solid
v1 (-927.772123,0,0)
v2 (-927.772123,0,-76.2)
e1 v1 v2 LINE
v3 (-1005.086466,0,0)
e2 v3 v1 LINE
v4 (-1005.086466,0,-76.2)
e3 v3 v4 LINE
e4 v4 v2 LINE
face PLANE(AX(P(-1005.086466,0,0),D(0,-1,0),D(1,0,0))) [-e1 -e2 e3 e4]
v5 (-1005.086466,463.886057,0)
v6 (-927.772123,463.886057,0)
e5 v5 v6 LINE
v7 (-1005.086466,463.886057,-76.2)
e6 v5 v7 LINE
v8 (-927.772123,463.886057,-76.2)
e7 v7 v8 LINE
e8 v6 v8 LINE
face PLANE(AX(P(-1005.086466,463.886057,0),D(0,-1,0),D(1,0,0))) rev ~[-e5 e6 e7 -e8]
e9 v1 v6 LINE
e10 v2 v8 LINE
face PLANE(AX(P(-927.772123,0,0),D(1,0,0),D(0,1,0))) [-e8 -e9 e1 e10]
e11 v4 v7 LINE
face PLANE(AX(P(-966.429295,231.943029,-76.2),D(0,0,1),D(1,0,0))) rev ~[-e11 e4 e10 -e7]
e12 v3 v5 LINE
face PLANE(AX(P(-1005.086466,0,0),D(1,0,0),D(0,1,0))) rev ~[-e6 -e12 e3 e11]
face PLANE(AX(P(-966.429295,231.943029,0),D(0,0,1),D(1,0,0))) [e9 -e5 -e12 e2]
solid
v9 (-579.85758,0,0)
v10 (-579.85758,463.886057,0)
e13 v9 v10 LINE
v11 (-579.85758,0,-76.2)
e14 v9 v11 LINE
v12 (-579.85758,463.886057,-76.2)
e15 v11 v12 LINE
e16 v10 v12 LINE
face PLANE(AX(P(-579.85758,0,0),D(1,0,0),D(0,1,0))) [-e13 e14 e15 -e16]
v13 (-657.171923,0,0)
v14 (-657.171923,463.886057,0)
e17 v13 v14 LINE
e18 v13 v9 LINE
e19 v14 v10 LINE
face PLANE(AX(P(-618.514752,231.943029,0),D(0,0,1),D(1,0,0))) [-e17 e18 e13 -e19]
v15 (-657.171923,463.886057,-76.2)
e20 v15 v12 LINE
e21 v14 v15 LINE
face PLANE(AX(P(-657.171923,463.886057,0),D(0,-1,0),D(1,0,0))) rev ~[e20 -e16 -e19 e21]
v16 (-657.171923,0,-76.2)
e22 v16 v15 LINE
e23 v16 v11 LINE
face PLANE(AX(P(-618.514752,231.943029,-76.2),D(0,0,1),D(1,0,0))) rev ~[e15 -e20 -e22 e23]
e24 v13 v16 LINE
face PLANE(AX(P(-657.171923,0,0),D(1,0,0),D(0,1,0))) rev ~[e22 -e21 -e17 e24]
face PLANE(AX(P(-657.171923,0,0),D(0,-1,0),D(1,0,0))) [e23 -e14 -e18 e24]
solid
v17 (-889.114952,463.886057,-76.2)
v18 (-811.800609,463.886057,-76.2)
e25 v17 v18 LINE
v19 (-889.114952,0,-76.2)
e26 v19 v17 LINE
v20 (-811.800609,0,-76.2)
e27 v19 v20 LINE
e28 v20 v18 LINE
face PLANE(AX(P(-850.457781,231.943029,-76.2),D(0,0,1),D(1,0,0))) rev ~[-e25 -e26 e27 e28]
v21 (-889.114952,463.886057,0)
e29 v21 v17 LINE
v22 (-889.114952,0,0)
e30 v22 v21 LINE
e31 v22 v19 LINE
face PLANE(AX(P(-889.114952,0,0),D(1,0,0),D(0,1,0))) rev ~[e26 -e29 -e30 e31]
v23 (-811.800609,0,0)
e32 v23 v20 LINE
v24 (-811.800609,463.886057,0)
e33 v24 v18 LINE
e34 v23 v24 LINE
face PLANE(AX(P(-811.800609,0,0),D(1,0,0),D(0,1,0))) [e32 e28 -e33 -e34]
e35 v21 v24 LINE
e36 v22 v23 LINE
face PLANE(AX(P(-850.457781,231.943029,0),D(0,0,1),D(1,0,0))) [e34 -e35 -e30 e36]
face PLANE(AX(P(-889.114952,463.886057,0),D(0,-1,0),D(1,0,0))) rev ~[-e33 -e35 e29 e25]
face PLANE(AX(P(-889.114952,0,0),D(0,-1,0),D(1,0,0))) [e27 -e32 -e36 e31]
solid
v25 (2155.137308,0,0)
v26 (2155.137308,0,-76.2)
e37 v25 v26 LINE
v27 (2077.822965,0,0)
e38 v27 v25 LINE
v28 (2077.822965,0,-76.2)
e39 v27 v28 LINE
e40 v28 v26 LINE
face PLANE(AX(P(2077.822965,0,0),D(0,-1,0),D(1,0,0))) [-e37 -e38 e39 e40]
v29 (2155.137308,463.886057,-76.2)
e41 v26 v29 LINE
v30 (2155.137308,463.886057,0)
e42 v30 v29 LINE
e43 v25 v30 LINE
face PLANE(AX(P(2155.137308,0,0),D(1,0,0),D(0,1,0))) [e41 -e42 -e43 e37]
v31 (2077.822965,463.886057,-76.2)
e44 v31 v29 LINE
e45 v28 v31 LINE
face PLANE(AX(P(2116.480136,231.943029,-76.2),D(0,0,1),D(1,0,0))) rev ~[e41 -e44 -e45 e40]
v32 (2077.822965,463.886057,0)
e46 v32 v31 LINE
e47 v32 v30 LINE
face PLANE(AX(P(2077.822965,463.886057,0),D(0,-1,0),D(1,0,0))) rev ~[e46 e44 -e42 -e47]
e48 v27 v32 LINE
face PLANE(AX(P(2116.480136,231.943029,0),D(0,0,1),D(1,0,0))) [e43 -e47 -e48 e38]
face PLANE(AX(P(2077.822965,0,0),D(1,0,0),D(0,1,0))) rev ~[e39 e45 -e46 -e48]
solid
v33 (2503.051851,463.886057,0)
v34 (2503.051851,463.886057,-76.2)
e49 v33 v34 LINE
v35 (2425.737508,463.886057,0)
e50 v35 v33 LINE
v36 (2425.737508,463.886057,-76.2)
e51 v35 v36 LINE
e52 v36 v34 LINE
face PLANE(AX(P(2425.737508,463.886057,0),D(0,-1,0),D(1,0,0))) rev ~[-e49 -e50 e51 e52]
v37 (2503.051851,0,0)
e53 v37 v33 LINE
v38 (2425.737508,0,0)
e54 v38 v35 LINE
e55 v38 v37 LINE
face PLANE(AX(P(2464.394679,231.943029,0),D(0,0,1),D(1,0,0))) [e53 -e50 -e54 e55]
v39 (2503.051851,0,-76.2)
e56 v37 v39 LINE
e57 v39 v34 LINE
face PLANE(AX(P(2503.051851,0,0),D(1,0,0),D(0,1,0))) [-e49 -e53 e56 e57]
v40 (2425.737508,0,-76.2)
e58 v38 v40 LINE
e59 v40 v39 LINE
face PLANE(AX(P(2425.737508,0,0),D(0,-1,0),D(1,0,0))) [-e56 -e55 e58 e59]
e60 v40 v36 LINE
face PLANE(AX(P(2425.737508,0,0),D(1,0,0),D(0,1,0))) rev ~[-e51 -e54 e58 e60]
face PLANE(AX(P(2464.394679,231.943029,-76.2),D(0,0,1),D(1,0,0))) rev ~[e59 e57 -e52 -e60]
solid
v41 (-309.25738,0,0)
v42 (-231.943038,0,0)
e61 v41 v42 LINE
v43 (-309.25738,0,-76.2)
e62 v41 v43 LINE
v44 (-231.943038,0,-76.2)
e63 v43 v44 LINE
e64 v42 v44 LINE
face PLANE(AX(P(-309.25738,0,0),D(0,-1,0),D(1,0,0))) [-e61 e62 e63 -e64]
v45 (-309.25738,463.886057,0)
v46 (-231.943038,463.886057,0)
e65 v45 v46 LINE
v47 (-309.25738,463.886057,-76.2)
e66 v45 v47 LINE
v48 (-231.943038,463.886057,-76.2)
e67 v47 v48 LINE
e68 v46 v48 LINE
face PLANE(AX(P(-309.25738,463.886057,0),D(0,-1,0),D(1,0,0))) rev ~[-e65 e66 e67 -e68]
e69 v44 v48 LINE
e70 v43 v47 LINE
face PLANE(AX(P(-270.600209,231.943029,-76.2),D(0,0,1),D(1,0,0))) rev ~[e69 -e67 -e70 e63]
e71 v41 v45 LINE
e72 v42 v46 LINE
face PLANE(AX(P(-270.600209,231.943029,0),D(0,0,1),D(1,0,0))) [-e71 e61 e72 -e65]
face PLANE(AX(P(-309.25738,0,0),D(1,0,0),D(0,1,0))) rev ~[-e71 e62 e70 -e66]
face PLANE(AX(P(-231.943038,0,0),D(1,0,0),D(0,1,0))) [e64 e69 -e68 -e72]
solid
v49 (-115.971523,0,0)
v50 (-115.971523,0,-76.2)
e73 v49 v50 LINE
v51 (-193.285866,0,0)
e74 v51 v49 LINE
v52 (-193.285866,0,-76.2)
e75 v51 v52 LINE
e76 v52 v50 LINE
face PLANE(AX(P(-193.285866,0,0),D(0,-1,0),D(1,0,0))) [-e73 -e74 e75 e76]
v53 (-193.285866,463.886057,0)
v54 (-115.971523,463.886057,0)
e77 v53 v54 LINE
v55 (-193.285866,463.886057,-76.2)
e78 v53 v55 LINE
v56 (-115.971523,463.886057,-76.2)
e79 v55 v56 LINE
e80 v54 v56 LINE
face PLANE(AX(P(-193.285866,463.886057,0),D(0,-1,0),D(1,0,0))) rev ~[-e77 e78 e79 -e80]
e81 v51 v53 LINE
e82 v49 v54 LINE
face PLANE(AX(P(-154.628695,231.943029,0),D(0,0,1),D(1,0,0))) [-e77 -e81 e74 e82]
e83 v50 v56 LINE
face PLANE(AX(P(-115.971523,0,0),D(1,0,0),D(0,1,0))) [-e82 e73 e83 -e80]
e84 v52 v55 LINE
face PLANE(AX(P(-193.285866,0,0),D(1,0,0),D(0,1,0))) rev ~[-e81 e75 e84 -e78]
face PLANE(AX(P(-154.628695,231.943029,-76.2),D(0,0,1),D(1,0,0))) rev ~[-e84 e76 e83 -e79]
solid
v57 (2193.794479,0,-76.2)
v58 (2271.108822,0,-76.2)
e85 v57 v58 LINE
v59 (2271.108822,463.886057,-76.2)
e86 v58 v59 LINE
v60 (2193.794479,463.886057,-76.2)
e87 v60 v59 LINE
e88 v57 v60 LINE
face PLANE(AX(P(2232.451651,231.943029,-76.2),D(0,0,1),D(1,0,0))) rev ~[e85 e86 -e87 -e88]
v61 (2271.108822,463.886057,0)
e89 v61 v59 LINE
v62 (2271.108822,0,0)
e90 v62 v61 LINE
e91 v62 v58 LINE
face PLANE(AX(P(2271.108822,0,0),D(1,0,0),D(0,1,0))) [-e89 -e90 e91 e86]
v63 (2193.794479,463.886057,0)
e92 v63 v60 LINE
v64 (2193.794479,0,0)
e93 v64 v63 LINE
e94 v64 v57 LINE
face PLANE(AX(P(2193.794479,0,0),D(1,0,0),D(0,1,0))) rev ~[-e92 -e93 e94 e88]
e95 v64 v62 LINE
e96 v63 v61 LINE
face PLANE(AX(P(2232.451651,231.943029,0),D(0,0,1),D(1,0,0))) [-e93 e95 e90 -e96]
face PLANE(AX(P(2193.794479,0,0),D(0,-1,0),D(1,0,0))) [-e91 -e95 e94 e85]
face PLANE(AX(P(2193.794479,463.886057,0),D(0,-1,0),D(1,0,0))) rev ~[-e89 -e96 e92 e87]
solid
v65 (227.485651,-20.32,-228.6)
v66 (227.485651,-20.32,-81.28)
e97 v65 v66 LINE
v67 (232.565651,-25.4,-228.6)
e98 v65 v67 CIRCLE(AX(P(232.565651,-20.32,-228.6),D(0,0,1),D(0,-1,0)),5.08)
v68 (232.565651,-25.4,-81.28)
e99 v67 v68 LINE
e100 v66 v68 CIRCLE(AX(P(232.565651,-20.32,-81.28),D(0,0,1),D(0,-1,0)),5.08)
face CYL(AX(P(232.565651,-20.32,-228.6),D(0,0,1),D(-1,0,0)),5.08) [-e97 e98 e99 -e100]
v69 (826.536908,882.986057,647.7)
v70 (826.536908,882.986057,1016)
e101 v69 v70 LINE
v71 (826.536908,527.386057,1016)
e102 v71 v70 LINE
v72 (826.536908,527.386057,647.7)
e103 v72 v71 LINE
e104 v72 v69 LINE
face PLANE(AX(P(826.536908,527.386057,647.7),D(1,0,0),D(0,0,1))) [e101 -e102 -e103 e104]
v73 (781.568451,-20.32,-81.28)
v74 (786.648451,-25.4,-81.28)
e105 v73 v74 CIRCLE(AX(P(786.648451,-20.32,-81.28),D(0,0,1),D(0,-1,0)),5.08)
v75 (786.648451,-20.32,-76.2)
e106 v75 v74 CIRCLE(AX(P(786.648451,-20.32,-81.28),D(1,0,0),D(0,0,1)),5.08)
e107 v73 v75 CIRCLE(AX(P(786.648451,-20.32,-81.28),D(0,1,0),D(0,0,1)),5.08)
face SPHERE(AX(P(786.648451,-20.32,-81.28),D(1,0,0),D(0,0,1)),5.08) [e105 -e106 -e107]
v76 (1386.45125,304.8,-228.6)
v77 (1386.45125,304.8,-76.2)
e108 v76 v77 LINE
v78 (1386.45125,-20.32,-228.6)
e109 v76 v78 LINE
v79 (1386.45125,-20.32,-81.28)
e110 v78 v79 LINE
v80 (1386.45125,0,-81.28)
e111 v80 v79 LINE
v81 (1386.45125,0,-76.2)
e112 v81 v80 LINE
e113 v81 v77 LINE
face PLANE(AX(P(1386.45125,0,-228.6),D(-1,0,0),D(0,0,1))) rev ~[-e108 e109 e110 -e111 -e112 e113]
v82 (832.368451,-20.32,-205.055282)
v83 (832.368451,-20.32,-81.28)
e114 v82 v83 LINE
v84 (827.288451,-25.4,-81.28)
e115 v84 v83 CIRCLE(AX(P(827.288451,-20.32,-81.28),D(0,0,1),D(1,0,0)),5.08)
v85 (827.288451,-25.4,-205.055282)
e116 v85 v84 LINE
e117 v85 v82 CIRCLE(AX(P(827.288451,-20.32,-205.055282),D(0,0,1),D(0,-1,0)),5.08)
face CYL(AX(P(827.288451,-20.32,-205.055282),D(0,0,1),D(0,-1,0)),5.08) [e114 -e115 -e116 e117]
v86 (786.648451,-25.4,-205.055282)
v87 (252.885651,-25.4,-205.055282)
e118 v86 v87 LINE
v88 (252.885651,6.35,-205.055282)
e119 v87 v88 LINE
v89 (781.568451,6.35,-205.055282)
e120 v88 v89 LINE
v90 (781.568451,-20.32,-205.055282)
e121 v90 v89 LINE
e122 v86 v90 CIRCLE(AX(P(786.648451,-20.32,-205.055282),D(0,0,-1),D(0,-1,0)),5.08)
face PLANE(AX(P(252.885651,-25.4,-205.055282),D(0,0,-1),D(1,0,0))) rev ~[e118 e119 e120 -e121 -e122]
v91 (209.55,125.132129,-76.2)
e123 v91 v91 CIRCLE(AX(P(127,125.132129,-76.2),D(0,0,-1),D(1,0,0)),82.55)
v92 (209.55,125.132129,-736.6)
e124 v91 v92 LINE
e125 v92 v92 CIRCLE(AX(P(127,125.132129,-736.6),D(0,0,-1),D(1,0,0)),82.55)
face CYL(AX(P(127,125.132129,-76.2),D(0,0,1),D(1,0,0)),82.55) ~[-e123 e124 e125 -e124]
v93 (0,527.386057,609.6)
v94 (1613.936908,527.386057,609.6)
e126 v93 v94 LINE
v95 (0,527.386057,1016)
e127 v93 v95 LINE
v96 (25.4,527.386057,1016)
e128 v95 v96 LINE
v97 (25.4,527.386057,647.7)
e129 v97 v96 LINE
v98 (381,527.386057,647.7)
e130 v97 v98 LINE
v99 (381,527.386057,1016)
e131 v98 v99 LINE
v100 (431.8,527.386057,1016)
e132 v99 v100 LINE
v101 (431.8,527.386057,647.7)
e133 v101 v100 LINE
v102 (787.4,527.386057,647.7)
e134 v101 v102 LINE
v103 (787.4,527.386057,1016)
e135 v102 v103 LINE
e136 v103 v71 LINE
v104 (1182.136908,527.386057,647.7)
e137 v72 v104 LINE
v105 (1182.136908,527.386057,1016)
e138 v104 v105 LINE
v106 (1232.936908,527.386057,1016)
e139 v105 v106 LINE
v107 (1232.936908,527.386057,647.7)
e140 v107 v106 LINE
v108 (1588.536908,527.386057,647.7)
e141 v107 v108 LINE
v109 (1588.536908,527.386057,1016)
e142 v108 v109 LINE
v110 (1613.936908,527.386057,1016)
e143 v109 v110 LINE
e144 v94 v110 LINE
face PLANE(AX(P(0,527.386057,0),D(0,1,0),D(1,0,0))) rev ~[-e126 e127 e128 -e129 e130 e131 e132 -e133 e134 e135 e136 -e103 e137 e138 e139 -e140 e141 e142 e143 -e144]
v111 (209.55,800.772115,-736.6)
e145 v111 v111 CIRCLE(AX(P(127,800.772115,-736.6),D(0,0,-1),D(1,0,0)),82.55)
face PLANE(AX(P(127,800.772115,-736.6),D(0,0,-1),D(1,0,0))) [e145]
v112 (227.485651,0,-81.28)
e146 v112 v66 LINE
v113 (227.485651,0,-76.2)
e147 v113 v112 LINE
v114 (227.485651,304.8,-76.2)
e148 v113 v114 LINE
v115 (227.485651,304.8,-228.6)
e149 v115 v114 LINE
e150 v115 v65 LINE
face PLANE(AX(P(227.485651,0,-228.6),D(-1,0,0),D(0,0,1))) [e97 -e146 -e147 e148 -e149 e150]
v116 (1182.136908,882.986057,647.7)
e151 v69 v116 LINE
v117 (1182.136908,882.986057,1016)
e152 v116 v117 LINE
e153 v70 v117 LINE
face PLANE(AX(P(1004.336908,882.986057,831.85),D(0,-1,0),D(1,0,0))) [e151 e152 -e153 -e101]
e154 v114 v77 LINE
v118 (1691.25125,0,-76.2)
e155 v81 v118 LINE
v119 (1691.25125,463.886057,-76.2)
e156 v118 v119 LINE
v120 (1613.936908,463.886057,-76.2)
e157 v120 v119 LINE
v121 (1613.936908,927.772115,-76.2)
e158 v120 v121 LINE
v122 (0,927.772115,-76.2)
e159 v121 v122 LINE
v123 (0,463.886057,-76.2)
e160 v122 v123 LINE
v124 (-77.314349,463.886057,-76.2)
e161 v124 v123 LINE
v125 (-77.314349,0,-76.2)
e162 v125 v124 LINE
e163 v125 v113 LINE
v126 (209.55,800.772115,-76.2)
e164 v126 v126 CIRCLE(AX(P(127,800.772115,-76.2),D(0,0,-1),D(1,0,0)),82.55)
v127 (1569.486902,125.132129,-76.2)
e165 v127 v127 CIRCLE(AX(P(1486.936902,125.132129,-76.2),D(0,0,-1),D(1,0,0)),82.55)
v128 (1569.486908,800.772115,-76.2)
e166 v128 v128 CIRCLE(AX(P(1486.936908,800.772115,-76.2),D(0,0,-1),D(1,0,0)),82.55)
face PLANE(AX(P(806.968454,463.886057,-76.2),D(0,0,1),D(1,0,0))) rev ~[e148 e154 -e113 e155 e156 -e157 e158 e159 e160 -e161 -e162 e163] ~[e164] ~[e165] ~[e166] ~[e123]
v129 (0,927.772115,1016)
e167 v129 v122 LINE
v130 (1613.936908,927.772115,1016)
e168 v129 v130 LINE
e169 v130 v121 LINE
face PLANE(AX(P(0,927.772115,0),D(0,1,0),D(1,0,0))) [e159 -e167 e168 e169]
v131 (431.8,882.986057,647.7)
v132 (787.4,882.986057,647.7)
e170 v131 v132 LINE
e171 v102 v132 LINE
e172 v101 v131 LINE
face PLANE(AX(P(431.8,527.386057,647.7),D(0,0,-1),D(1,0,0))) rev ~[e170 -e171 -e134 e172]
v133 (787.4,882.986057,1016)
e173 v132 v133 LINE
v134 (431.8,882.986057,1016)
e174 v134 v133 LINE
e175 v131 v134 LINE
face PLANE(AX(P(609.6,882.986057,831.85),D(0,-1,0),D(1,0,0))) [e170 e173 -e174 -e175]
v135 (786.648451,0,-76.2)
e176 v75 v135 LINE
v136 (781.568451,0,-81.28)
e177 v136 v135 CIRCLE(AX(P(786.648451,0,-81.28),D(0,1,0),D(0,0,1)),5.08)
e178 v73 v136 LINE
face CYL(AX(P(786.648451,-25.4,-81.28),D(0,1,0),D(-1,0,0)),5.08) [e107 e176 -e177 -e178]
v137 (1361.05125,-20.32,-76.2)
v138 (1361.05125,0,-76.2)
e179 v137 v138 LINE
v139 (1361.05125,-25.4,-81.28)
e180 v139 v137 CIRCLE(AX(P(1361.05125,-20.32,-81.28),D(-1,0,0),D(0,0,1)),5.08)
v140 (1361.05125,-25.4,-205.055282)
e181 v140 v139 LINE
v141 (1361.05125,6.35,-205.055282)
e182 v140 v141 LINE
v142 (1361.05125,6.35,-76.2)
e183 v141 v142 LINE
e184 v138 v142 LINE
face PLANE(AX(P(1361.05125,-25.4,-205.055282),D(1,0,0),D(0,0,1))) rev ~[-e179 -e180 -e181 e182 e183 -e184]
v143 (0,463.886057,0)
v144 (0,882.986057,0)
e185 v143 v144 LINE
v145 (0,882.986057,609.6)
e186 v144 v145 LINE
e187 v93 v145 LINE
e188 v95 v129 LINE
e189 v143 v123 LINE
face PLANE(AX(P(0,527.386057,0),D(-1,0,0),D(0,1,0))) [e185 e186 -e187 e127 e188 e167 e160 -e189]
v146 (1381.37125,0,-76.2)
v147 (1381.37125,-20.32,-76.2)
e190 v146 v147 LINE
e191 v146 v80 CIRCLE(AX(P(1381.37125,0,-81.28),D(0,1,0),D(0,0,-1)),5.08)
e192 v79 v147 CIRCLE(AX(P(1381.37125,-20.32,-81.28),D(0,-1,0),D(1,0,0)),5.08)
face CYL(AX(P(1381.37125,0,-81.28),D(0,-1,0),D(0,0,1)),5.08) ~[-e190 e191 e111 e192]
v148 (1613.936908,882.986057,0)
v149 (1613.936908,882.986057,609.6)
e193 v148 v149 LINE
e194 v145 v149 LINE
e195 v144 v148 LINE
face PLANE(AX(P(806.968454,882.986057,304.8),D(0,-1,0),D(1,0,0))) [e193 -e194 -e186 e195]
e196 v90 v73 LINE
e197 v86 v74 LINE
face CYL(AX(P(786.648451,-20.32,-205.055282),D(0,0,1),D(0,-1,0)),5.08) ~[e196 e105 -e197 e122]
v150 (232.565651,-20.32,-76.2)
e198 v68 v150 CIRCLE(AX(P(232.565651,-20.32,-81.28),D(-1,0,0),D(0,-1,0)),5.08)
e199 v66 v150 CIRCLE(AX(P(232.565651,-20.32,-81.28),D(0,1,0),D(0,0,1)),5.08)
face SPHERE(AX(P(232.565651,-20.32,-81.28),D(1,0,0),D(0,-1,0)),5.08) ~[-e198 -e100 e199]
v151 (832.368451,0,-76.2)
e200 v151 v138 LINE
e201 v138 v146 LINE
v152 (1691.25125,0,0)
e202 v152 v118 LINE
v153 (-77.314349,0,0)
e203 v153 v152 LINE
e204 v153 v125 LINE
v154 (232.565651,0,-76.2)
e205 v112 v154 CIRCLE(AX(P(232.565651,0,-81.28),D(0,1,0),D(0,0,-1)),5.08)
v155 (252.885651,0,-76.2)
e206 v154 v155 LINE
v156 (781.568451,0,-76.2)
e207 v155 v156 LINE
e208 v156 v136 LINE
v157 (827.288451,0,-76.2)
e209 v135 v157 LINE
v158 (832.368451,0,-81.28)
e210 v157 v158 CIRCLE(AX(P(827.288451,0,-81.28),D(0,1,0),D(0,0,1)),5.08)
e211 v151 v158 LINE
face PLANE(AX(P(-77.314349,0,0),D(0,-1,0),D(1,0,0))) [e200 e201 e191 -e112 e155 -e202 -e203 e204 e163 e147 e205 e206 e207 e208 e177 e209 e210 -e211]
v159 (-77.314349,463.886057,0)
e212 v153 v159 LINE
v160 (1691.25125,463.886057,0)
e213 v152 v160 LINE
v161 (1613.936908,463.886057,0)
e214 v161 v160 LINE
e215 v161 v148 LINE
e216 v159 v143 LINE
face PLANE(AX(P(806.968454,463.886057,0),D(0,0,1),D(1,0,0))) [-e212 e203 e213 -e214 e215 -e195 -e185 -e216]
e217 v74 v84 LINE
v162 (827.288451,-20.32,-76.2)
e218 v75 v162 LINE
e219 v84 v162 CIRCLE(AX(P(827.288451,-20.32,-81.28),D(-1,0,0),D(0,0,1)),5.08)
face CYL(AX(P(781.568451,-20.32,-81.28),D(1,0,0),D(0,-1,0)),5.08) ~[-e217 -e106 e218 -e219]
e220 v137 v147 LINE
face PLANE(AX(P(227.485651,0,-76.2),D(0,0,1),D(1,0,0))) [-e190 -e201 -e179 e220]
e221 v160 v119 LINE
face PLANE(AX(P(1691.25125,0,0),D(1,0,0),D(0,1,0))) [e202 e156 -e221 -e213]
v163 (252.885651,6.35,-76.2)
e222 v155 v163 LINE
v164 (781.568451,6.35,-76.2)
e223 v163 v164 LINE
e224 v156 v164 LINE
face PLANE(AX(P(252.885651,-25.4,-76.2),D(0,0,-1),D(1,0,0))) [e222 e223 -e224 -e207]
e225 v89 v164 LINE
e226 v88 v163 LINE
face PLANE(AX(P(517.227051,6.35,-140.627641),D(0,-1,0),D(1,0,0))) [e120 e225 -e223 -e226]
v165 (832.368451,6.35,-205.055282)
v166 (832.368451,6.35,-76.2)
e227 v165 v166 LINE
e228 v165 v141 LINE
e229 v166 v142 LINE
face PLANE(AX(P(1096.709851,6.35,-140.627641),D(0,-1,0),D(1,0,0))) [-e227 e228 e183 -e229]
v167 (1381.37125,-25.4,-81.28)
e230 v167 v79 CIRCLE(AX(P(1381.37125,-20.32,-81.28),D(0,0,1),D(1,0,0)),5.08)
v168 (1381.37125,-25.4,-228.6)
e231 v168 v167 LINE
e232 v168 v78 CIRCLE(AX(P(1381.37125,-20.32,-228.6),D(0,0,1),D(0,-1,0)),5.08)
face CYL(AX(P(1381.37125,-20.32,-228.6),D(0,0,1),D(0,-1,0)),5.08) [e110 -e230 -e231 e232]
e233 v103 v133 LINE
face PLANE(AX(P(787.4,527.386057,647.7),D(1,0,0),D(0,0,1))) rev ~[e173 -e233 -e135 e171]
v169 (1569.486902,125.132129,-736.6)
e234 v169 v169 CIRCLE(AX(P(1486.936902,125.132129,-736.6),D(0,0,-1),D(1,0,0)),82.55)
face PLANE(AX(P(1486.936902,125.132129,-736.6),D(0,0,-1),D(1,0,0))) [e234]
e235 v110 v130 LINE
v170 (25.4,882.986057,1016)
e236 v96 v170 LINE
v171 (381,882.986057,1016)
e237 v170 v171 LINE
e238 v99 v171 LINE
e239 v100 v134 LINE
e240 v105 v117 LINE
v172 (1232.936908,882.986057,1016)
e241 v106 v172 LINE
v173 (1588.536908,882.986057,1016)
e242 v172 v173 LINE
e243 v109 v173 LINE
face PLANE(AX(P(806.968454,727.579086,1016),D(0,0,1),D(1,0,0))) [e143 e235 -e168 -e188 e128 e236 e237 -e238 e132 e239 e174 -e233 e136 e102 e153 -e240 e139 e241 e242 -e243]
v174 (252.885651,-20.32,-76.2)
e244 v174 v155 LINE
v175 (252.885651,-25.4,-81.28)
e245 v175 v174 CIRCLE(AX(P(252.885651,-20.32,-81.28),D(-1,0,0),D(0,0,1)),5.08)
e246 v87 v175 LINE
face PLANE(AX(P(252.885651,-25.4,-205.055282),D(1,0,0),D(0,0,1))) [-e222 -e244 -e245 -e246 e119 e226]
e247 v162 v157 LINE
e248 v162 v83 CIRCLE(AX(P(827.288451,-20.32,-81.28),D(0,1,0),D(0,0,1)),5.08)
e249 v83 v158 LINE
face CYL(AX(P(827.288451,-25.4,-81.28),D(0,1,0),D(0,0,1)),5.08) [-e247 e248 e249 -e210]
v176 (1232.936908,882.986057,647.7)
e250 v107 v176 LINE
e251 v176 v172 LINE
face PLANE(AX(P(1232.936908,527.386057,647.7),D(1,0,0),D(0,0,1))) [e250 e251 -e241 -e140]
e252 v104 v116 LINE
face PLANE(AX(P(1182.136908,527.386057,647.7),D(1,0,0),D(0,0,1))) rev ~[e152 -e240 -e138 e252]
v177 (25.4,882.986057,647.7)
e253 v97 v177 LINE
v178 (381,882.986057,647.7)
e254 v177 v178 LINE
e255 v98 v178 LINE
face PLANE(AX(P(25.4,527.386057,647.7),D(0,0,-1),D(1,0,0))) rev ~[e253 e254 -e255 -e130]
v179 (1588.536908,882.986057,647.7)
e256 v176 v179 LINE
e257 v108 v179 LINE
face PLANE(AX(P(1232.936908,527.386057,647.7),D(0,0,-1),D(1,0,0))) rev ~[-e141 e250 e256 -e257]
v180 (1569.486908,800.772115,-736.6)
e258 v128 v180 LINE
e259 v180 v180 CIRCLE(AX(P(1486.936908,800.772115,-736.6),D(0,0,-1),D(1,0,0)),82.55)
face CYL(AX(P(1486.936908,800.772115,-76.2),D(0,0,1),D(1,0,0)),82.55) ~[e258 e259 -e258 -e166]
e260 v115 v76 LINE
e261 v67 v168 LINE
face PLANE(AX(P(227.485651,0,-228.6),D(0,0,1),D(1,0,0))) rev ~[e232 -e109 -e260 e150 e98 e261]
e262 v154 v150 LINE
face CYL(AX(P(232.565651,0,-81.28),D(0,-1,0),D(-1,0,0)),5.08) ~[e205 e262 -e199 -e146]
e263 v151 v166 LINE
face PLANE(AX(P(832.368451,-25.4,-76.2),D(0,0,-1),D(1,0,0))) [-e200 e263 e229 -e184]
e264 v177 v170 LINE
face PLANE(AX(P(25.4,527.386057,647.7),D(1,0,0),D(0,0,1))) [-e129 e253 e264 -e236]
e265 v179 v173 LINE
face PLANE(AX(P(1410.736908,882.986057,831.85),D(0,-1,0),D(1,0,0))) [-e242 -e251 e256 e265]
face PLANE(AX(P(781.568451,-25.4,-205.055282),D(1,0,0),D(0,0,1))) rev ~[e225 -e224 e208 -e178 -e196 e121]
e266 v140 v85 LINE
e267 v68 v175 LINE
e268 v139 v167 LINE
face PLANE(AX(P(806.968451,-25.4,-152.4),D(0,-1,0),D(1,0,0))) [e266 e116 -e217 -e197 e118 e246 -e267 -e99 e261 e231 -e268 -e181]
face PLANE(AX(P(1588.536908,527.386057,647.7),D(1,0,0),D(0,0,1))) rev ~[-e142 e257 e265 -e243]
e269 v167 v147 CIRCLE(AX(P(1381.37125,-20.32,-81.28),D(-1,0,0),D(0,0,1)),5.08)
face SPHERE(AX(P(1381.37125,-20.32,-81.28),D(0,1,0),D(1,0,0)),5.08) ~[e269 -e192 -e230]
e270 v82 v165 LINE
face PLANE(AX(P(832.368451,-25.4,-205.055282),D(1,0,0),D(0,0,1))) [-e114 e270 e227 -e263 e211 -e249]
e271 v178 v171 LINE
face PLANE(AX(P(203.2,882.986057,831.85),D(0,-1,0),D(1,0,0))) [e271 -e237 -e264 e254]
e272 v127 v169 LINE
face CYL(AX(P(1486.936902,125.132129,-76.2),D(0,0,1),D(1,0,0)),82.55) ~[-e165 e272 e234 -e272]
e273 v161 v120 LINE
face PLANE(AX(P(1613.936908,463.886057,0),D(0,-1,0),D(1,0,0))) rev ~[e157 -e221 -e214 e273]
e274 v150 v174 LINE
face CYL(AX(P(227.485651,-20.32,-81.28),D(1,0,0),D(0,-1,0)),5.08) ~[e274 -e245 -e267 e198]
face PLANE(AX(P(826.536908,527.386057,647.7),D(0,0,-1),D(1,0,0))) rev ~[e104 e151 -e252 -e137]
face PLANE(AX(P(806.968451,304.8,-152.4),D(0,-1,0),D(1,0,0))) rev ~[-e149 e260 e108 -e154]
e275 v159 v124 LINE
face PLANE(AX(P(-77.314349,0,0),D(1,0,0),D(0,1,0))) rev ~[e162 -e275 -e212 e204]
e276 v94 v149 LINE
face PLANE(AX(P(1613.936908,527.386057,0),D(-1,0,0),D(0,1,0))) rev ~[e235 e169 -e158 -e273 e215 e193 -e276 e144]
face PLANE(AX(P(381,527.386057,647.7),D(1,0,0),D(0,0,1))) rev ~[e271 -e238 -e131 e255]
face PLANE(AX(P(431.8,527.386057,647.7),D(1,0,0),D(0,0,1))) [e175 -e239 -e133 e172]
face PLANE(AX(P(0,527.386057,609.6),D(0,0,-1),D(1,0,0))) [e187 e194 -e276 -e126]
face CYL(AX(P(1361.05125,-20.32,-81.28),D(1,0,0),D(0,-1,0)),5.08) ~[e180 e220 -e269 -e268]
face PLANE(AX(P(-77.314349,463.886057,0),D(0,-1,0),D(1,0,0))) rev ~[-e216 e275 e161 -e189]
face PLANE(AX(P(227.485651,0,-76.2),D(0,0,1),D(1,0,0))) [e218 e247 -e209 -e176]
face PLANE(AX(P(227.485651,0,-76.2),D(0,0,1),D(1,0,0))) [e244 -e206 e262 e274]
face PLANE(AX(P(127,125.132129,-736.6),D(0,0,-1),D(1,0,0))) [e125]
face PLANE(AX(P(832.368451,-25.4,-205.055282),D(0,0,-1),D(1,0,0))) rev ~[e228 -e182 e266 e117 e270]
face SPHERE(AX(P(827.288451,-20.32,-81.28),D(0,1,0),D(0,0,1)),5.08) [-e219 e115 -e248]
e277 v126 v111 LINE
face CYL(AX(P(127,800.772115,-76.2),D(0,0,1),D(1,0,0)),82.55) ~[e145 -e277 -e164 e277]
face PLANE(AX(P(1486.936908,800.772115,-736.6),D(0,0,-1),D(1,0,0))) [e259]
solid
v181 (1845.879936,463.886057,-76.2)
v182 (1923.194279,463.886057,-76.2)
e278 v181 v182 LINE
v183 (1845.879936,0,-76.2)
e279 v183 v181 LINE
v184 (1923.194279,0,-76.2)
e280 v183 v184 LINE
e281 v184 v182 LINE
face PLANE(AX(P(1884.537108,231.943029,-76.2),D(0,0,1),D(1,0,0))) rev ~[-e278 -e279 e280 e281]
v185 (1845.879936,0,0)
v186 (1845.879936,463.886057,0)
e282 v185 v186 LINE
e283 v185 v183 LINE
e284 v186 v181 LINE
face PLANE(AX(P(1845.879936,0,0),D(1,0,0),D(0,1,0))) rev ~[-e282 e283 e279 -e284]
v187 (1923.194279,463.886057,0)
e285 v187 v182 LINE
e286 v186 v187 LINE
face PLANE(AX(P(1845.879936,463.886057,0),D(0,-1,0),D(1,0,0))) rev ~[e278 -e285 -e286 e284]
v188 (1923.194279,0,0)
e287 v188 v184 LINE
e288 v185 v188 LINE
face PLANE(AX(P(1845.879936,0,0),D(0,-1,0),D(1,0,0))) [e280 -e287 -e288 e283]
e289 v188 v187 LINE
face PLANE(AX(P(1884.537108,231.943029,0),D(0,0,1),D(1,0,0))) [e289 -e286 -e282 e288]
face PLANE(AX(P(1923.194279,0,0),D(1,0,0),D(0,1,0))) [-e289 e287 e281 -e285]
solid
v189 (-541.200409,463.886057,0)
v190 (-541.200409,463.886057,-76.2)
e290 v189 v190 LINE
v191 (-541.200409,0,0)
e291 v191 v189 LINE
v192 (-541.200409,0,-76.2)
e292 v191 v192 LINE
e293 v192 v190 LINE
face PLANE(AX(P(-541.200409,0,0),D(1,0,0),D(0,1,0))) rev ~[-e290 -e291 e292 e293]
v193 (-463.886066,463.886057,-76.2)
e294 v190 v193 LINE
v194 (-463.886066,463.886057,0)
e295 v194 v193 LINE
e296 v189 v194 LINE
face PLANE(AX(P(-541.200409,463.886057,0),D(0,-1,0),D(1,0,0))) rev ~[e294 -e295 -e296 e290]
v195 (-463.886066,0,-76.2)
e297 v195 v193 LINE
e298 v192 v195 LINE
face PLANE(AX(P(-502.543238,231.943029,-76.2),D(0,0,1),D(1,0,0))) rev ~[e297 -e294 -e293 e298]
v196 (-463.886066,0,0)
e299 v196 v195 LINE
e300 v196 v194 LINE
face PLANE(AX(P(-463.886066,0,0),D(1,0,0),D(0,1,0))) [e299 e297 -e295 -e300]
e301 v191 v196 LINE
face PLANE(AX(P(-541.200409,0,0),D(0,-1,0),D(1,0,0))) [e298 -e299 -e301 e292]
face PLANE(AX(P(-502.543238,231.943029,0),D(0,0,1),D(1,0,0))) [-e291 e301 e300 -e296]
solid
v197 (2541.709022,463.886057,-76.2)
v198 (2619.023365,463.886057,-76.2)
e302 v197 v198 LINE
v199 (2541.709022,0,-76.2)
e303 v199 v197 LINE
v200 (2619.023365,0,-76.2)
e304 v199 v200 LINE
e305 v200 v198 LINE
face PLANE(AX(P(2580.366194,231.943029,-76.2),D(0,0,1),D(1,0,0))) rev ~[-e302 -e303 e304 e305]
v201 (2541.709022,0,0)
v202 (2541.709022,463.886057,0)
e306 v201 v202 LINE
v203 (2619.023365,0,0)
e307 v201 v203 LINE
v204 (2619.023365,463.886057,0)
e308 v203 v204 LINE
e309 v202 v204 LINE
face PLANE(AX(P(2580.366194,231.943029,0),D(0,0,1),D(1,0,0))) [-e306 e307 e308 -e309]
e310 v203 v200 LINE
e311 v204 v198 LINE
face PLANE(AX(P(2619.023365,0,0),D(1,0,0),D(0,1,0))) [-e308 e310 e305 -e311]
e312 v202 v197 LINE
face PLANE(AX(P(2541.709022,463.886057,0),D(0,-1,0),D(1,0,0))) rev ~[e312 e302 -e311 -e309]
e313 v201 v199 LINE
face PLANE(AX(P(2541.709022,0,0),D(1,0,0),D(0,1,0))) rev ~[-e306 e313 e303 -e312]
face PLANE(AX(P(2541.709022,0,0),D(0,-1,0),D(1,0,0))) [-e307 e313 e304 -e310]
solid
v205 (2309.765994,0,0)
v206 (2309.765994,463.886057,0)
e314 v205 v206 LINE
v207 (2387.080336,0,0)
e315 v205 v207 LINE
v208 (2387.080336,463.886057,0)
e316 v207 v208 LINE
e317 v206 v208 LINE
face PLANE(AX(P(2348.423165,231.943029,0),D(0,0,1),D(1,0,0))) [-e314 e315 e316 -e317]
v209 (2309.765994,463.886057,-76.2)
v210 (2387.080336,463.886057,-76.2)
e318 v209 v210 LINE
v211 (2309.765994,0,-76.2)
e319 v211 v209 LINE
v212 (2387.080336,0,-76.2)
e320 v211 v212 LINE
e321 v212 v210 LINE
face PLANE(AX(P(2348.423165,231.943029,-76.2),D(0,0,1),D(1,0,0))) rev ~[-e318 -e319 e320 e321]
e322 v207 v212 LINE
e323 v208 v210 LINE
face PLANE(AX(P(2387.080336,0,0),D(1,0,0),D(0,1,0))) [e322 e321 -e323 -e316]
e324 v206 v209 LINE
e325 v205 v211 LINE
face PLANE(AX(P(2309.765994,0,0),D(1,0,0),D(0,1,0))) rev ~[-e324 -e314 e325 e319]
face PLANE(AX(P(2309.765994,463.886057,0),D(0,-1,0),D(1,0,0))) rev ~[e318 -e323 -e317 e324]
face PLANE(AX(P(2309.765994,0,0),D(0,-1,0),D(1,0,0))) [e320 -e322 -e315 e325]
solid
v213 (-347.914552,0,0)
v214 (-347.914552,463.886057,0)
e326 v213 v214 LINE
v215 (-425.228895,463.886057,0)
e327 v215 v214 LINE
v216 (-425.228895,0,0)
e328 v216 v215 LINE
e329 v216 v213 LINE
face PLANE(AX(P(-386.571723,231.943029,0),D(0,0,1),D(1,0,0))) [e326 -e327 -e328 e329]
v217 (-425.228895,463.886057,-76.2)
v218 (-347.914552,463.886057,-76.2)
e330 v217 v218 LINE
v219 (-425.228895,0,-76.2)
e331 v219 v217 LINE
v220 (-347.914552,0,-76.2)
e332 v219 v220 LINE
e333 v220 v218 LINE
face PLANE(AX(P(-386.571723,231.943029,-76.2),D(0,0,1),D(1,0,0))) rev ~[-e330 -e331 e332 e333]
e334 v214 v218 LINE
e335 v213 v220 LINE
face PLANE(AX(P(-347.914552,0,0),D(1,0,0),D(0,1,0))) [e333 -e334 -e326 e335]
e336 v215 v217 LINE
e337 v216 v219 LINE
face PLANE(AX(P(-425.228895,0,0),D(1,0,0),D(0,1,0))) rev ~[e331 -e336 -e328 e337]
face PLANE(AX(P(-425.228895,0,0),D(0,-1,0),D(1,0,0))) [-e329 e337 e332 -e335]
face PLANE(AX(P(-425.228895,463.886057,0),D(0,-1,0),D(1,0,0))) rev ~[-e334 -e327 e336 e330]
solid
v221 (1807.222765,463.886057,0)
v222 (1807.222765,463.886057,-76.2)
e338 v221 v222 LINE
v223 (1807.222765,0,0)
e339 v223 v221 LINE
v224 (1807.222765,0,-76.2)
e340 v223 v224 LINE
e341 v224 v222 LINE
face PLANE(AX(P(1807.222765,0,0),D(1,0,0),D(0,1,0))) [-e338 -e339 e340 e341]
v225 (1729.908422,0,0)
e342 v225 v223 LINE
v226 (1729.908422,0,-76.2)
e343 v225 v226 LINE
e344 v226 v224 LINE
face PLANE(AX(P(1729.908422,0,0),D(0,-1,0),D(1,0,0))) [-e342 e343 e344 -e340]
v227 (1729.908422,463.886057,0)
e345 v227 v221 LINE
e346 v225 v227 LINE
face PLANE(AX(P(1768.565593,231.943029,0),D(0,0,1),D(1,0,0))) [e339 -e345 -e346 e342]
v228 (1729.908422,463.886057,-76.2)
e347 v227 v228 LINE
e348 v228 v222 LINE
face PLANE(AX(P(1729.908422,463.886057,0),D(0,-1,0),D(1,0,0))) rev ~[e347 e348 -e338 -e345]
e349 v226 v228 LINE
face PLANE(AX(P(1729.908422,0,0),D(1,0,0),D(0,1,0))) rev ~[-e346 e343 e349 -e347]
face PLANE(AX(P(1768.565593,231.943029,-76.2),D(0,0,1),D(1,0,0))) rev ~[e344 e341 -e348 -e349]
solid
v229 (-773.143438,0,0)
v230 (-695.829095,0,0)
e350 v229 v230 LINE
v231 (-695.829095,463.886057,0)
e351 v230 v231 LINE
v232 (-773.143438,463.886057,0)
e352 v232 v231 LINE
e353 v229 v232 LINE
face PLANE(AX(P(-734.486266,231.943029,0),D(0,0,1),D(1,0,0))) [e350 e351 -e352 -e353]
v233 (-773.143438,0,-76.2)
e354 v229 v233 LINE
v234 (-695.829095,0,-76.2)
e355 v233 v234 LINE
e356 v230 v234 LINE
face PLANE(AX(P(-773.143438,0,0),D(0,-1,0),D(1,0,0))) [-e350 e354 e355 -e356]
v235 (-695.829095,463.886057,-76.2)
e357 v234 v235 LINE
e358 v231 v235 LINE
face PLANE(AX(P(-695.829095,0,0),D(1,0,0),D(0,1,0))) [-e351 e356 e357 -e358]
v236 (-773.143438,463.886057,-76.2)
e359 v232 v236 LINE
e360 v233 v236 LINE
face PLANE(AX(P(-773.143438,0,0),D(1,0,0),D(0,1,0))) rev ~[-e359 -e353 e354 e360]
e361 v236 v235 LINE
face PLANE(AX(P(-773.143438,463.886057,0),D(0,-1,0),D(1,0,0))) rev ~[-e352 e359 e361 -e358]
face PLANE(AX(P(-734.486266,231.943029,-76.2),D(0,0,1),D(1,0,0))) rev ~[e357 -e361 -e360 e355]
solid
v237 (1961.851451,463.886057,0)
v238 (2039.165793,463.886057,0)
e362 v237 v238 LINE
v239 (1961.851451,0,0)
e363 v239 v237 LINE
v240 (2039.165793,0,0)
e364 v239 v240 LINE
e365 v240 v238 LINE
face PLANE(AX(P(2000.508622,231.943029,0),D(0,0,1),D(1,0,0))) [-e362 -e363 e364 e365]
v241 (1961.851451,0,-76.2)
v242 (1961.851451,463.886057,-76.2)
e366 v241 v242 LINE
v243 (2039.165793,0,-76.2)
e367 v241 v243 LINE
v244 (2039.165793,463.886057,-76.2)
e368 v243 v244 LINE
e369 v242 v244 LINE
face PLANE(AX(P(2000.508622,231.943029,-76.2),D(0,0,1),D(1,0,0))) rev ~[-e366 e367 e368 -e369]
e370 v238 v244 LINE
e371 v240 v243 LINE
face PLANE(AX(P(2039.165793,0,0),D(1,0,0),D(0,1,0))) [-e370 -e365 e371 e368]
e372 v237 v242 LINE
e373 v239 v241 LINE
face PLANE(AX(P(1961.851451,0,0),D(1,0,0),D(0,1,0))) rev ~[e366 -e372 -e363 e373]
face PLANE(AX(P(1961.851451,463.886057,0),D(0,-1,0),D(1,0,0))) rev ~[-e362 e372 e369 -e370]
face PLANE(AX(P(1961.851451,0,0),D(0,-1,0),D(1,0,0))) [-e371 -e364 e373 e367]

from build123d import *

# Parameters (mm, degrees)
F0_W           = 77.3143488
F0_H           = 463.8860572777
F0_W_2         = 77.3143428796
F1_DEPTH       = 76.2
F2_W           = 1613.9369076119
F2_H           = 400.3860572777
F3_DEPTH       = 1016
F4_R           = 82.55
F5_DEPTH       = 660.4
F6_W           = 1613.9369076119
F6_H           = 609.6
F7_DEPTH       = 355.6
F8_W           = 355.6
F8_H           = 368.3
F9_DEPTH       = 355.6
F10_W          = 1158.9655992915
F10_H          = 152.4
F11_DEPTH      = 304.8
F11_DEPTH_BACK = 25.4
F12_W          = 528.6827996458
F12_H          = 128.8552815199
F13_DEPTH      = 31.75
F14_R          = 5.08


# Not quite as in the source:
# - two fillets or chamfers of one size are made in one step


with BuildPart() as f1:
    # F0 (on Top) → F1 (new body)
    with BuildSketch(Plane.XY):
        Polygon((0, 463.8860572777), (0, 0), (1613.9369076119, 0), (1613.9369076119, 463.8860572777), (1613.9369076119, 927.7721145553), (0, 927.7721145553), align=None)
        with Locations((-38.6571744, 231.9430286388)):
            Rectangle(F0_W, F0_H)
        with Locations((1652.5940790517, 231.9430286388)):
            Rectangle(F0_W_2, F0_H)
    extrude(amount=-F1_DEPTH)

    # F2 (on face) → F3 (join)
    with BuildSketch(Plane.XY):
        with Locations((806.968453806, 727.5790859165)):
            Rectangle(F2_W, F2_H)
    extrude(amount=F3_DEPTH)

    # F4 (on face) → F5 (join)
    with BuildSketch(Plane(origin=(0, 0, -76.2), x_dir=(1, 0, 0), z_dir=(0, 0, -1))):
        with Locations((127, -800.7721145553)):
            Circle(F4_R)
        with Locations((1486.9369076119, -800.7721145553)):
            Circle(F4_R)
        with Locations((127, -125.1321285963)):
            Circle(F4_R)
        with Locations((1486.9369016915, -125.1321285963)):
            Circle(F4_R)
    extrude(amount=F5_DEPTH)

    # F6 (on face) → F7 (cut)
    with BuildSketch(Plane.XZ.offset(-527.3860572777)):
        with Locations((806.968453806, 304.8)):
            Rectangle(F6_W, F6_H)
    extrude(amount=-F7_DEPTH, mode=Mode.SUBTRACT)

    # F8 (on face) → F9 (cut)
    with BuildSketch(Plane.XZ.offset(-527.3860572777)):
        with Locations((203.2, 831.85)):
            Rectangle(F8_W, F8_H)
        with Locations((609.6, 831.85)):
            Rectangle(F8_W, F8_H)
        with Locations((1004.3369076119, 831.85)):
            Rectangle(F8_W, F8_H)
        with Locations((1410.7369076119, 831.85)):
            Rectangle(F8_W, F8_H)
    extrude(amount=-F9_DEPTH, mode=Mode.SUBTRACT)

    # F10 (on face) → F11 (join, two sides)
    with BuildSketch(Plane.XZ) as f11_sk:
        with Locations((806.9684508458, -152.4)):
            Rectangle(F10_W, F10_H)
    extrude(amount=-F11_DEPTH)
    extrude(f11_sk.sketch, amount=F11_DEPTH_BACK)

    # F12 (on face) → F13 (cut)
    with BuildSketch(Plane.XZ.offset(25.4)):
        with Locations((517.2270510229, -140.6276407599)):
            Rectangle(F12_W, F12_H)
        with Locations((1096.7098506686, -140.6276407599)):
            Rectangle(F12_W, F12_H)
    extrude(amount=-F13_DEPTH, mode=Mode.SUBTRACT)

    # F14
    f14_edges = [f1.edges().sort_by_distance(p)[0] for p in [
        (240.185651, -25.4, -76.2),
        (227.485651, -25.4, -152.4),
        (1386.45125, -12.7, -76.2),
        (1386.45125, -25.4, -152.4),
        (227.485651, -12.7, -76.2),
        (832.368451, -12.7, -76.2),
        (806.968451, -25.4, -76.2),
        (781.568451, -12.7, -76.2),
        (1373.75125, -25.4, -76.2),
        (781.568451, -25.4, -140.627641),
        (832.368451, -25.4, -140.627641),
    ]]
    fillet(f14_edges, radius=F14_R)


with BuildPart() as f1b:
    # F0 (on Top) → F1, piece 2 (new body)
    with BuildSketch(Plane.XY):
        with Locations((1768.5655933711, 231.9430286388)):
            Rectangle(F0_W_2, F0_H)
    extrude(amount=-F1_DEPTH)


with BuildPart() as f1c:
    # F0 (on Top) → F1, piece 3 (new body)
    with BuildSketch(Plane.XY):
        with Locations((1884.5371076906, 231.9430286388)):
            Rectangle(F0_W_2, F0_H)
    extrude(amount=-F1_DEPTH)


with BuildPart() as f1d:
    # F0 (on Top) → F1, piece 4 (new body)
    with BuildSketch(Plane.XY):
        with Locations((2000.50862201, 231.9430286388)):
            Rectangle(F0_W_2, F0_H)
    extrude(amount=-F1_DEPTH)


with BuildPart() as f1e:
    # F0 (on Top) → F1, piece 5 (new body)
    with BuildSketch(Plane.XY):
        with Locations((2116.4801363294, 231.9430286388)):
            Rectangle(F0_W_2, F0_H)
    extrude(amount=-F1_DEPTH)


with BuildPart() as f1f:
    # F0 (on Top) → F1, piece 6 (new body)
    with BuildSketch(Plane.XY):
        with Locations((2232.4516506488, 231.9430286388)):
            Rectangle(F0_W_2, F0_H)
    extrude(amount=-F1_DEPTH)


with BuildPart() as f1g:
    # F0 (on Top) → F1, piece 7 (new body)
    with BuildSketch(Plane.XY):
        with Locations((2348.4231649682, 231.9430286388)):
            Rectangle(F0_W_2, F0_H)
    extrude(amount=-F1_DEPTH)


with BuildPart() as f1h:
    # F0 (on Top) → F1, piece 8 (new body)
    with BuildSketch(Plane.XY):
        with Locations((2464.3946792876, 231.9430286388)):
            Rectangle(F0_W_2, F0_H)
    extrude(amount=-F1_DEPTH)


with BuildPart() as f1i:
    # F0 (on Top) → F1, piece 9 (new body)
    with BuildSketch(Plane.XY):
        with Locations((2580.3661936071, 231.9430286388)):
            Rectangle(F0_W_2, F0_H)
    extrude(amount=-F1_DEPTH)


with BuildPart() as f1j:
    # F0 (on Top) → F1, piece 10 (new body)
    with BuildSketch(Plane.XY):
        with Locations((-966.4292948757, 231.9430286388)):
            Rectangle(F0_W_2, F0_H)
    extrude(amount=-F1_DEPTH)


with BuildPart() as f1k:
    # F0 (on Top) → F1, piece 11 (new body)
    with BuildSketch(Plane.XY):
        with Locations((-850.4577805563, 231.9430286388)):
            Rectangle(F0_W_2, F0_H)
    extrude(amount=-F1_DEPTH)


with BuildPart() as f1l:
    # F0 (on Top) → F1, piece 12 (new body)
    with BuildSketch(Plane.XY):
        with Locations((-734.4862662369, 231.9430286388)):
            Rectangle(F0_W_2, F0_H)
    extrude(amount=-F1_DEPTH)


with BuildPart() as f1m:
    # F0 (on Top) → F1, piece 13 (new body)
    with BuildSketch(Plane.XY):
        with Locations((-618.5147519175, 231.9430286388)):
            Rectangle(F0_W_2, F0_H)
    extrude(amount=-F1_DEPTH)


with BuildPart() as f1n:
    # F0 (on Top) → F1, piece 14 (new body)
    with BuildSketch(Plane.XY):
        with Locations((-502.5432375981, 231.9430286388)):
            Rectangle(F0_W_2, F0_H)
    extrude(amount=-F1_DEPTH)


with BuildPart() as f1o:
    # F0 (on Top) → F1, piece 15 (new body)
    with BuildSketch(Plane.XY):
        with Locations((-386.5717232786, 231.9430286388)):
            Rectangle(F0_W_2, F0_H)
    extrude(amount=-F1_DEPTH)


with BuildPart() as f1p:
    # F0 (on Top) → F1, piece 16 (new body)
    with BuildSketch(Plane.XY):
        with Locations((-270.6002089592, 231.9430286388)):
            Rectangle(F0_W_2, F0_H)
    extrude(amount=-F1_DEPTH)


with BuildPart() as f1q:
    # F0 (on Top) → F1, piece 17 (new body)
    with BuildSketch(Plane.XY):
        with Locations((-154.6286946398, 231.9430286388)):
            Rectangle(F0_W_2, F0_H)
    extrude(amount=-F1_DEPTH)


solid = Compound([f1.part, f1b.part, f1c.part, f1d.part, f1e.part, f1f.part, f1g.part, f1h.part, f1i.part, f1j.part, f1k.part, f1l.part, f1m.part, f1n.part, f1o.part, f1p.part, f1q.part])
